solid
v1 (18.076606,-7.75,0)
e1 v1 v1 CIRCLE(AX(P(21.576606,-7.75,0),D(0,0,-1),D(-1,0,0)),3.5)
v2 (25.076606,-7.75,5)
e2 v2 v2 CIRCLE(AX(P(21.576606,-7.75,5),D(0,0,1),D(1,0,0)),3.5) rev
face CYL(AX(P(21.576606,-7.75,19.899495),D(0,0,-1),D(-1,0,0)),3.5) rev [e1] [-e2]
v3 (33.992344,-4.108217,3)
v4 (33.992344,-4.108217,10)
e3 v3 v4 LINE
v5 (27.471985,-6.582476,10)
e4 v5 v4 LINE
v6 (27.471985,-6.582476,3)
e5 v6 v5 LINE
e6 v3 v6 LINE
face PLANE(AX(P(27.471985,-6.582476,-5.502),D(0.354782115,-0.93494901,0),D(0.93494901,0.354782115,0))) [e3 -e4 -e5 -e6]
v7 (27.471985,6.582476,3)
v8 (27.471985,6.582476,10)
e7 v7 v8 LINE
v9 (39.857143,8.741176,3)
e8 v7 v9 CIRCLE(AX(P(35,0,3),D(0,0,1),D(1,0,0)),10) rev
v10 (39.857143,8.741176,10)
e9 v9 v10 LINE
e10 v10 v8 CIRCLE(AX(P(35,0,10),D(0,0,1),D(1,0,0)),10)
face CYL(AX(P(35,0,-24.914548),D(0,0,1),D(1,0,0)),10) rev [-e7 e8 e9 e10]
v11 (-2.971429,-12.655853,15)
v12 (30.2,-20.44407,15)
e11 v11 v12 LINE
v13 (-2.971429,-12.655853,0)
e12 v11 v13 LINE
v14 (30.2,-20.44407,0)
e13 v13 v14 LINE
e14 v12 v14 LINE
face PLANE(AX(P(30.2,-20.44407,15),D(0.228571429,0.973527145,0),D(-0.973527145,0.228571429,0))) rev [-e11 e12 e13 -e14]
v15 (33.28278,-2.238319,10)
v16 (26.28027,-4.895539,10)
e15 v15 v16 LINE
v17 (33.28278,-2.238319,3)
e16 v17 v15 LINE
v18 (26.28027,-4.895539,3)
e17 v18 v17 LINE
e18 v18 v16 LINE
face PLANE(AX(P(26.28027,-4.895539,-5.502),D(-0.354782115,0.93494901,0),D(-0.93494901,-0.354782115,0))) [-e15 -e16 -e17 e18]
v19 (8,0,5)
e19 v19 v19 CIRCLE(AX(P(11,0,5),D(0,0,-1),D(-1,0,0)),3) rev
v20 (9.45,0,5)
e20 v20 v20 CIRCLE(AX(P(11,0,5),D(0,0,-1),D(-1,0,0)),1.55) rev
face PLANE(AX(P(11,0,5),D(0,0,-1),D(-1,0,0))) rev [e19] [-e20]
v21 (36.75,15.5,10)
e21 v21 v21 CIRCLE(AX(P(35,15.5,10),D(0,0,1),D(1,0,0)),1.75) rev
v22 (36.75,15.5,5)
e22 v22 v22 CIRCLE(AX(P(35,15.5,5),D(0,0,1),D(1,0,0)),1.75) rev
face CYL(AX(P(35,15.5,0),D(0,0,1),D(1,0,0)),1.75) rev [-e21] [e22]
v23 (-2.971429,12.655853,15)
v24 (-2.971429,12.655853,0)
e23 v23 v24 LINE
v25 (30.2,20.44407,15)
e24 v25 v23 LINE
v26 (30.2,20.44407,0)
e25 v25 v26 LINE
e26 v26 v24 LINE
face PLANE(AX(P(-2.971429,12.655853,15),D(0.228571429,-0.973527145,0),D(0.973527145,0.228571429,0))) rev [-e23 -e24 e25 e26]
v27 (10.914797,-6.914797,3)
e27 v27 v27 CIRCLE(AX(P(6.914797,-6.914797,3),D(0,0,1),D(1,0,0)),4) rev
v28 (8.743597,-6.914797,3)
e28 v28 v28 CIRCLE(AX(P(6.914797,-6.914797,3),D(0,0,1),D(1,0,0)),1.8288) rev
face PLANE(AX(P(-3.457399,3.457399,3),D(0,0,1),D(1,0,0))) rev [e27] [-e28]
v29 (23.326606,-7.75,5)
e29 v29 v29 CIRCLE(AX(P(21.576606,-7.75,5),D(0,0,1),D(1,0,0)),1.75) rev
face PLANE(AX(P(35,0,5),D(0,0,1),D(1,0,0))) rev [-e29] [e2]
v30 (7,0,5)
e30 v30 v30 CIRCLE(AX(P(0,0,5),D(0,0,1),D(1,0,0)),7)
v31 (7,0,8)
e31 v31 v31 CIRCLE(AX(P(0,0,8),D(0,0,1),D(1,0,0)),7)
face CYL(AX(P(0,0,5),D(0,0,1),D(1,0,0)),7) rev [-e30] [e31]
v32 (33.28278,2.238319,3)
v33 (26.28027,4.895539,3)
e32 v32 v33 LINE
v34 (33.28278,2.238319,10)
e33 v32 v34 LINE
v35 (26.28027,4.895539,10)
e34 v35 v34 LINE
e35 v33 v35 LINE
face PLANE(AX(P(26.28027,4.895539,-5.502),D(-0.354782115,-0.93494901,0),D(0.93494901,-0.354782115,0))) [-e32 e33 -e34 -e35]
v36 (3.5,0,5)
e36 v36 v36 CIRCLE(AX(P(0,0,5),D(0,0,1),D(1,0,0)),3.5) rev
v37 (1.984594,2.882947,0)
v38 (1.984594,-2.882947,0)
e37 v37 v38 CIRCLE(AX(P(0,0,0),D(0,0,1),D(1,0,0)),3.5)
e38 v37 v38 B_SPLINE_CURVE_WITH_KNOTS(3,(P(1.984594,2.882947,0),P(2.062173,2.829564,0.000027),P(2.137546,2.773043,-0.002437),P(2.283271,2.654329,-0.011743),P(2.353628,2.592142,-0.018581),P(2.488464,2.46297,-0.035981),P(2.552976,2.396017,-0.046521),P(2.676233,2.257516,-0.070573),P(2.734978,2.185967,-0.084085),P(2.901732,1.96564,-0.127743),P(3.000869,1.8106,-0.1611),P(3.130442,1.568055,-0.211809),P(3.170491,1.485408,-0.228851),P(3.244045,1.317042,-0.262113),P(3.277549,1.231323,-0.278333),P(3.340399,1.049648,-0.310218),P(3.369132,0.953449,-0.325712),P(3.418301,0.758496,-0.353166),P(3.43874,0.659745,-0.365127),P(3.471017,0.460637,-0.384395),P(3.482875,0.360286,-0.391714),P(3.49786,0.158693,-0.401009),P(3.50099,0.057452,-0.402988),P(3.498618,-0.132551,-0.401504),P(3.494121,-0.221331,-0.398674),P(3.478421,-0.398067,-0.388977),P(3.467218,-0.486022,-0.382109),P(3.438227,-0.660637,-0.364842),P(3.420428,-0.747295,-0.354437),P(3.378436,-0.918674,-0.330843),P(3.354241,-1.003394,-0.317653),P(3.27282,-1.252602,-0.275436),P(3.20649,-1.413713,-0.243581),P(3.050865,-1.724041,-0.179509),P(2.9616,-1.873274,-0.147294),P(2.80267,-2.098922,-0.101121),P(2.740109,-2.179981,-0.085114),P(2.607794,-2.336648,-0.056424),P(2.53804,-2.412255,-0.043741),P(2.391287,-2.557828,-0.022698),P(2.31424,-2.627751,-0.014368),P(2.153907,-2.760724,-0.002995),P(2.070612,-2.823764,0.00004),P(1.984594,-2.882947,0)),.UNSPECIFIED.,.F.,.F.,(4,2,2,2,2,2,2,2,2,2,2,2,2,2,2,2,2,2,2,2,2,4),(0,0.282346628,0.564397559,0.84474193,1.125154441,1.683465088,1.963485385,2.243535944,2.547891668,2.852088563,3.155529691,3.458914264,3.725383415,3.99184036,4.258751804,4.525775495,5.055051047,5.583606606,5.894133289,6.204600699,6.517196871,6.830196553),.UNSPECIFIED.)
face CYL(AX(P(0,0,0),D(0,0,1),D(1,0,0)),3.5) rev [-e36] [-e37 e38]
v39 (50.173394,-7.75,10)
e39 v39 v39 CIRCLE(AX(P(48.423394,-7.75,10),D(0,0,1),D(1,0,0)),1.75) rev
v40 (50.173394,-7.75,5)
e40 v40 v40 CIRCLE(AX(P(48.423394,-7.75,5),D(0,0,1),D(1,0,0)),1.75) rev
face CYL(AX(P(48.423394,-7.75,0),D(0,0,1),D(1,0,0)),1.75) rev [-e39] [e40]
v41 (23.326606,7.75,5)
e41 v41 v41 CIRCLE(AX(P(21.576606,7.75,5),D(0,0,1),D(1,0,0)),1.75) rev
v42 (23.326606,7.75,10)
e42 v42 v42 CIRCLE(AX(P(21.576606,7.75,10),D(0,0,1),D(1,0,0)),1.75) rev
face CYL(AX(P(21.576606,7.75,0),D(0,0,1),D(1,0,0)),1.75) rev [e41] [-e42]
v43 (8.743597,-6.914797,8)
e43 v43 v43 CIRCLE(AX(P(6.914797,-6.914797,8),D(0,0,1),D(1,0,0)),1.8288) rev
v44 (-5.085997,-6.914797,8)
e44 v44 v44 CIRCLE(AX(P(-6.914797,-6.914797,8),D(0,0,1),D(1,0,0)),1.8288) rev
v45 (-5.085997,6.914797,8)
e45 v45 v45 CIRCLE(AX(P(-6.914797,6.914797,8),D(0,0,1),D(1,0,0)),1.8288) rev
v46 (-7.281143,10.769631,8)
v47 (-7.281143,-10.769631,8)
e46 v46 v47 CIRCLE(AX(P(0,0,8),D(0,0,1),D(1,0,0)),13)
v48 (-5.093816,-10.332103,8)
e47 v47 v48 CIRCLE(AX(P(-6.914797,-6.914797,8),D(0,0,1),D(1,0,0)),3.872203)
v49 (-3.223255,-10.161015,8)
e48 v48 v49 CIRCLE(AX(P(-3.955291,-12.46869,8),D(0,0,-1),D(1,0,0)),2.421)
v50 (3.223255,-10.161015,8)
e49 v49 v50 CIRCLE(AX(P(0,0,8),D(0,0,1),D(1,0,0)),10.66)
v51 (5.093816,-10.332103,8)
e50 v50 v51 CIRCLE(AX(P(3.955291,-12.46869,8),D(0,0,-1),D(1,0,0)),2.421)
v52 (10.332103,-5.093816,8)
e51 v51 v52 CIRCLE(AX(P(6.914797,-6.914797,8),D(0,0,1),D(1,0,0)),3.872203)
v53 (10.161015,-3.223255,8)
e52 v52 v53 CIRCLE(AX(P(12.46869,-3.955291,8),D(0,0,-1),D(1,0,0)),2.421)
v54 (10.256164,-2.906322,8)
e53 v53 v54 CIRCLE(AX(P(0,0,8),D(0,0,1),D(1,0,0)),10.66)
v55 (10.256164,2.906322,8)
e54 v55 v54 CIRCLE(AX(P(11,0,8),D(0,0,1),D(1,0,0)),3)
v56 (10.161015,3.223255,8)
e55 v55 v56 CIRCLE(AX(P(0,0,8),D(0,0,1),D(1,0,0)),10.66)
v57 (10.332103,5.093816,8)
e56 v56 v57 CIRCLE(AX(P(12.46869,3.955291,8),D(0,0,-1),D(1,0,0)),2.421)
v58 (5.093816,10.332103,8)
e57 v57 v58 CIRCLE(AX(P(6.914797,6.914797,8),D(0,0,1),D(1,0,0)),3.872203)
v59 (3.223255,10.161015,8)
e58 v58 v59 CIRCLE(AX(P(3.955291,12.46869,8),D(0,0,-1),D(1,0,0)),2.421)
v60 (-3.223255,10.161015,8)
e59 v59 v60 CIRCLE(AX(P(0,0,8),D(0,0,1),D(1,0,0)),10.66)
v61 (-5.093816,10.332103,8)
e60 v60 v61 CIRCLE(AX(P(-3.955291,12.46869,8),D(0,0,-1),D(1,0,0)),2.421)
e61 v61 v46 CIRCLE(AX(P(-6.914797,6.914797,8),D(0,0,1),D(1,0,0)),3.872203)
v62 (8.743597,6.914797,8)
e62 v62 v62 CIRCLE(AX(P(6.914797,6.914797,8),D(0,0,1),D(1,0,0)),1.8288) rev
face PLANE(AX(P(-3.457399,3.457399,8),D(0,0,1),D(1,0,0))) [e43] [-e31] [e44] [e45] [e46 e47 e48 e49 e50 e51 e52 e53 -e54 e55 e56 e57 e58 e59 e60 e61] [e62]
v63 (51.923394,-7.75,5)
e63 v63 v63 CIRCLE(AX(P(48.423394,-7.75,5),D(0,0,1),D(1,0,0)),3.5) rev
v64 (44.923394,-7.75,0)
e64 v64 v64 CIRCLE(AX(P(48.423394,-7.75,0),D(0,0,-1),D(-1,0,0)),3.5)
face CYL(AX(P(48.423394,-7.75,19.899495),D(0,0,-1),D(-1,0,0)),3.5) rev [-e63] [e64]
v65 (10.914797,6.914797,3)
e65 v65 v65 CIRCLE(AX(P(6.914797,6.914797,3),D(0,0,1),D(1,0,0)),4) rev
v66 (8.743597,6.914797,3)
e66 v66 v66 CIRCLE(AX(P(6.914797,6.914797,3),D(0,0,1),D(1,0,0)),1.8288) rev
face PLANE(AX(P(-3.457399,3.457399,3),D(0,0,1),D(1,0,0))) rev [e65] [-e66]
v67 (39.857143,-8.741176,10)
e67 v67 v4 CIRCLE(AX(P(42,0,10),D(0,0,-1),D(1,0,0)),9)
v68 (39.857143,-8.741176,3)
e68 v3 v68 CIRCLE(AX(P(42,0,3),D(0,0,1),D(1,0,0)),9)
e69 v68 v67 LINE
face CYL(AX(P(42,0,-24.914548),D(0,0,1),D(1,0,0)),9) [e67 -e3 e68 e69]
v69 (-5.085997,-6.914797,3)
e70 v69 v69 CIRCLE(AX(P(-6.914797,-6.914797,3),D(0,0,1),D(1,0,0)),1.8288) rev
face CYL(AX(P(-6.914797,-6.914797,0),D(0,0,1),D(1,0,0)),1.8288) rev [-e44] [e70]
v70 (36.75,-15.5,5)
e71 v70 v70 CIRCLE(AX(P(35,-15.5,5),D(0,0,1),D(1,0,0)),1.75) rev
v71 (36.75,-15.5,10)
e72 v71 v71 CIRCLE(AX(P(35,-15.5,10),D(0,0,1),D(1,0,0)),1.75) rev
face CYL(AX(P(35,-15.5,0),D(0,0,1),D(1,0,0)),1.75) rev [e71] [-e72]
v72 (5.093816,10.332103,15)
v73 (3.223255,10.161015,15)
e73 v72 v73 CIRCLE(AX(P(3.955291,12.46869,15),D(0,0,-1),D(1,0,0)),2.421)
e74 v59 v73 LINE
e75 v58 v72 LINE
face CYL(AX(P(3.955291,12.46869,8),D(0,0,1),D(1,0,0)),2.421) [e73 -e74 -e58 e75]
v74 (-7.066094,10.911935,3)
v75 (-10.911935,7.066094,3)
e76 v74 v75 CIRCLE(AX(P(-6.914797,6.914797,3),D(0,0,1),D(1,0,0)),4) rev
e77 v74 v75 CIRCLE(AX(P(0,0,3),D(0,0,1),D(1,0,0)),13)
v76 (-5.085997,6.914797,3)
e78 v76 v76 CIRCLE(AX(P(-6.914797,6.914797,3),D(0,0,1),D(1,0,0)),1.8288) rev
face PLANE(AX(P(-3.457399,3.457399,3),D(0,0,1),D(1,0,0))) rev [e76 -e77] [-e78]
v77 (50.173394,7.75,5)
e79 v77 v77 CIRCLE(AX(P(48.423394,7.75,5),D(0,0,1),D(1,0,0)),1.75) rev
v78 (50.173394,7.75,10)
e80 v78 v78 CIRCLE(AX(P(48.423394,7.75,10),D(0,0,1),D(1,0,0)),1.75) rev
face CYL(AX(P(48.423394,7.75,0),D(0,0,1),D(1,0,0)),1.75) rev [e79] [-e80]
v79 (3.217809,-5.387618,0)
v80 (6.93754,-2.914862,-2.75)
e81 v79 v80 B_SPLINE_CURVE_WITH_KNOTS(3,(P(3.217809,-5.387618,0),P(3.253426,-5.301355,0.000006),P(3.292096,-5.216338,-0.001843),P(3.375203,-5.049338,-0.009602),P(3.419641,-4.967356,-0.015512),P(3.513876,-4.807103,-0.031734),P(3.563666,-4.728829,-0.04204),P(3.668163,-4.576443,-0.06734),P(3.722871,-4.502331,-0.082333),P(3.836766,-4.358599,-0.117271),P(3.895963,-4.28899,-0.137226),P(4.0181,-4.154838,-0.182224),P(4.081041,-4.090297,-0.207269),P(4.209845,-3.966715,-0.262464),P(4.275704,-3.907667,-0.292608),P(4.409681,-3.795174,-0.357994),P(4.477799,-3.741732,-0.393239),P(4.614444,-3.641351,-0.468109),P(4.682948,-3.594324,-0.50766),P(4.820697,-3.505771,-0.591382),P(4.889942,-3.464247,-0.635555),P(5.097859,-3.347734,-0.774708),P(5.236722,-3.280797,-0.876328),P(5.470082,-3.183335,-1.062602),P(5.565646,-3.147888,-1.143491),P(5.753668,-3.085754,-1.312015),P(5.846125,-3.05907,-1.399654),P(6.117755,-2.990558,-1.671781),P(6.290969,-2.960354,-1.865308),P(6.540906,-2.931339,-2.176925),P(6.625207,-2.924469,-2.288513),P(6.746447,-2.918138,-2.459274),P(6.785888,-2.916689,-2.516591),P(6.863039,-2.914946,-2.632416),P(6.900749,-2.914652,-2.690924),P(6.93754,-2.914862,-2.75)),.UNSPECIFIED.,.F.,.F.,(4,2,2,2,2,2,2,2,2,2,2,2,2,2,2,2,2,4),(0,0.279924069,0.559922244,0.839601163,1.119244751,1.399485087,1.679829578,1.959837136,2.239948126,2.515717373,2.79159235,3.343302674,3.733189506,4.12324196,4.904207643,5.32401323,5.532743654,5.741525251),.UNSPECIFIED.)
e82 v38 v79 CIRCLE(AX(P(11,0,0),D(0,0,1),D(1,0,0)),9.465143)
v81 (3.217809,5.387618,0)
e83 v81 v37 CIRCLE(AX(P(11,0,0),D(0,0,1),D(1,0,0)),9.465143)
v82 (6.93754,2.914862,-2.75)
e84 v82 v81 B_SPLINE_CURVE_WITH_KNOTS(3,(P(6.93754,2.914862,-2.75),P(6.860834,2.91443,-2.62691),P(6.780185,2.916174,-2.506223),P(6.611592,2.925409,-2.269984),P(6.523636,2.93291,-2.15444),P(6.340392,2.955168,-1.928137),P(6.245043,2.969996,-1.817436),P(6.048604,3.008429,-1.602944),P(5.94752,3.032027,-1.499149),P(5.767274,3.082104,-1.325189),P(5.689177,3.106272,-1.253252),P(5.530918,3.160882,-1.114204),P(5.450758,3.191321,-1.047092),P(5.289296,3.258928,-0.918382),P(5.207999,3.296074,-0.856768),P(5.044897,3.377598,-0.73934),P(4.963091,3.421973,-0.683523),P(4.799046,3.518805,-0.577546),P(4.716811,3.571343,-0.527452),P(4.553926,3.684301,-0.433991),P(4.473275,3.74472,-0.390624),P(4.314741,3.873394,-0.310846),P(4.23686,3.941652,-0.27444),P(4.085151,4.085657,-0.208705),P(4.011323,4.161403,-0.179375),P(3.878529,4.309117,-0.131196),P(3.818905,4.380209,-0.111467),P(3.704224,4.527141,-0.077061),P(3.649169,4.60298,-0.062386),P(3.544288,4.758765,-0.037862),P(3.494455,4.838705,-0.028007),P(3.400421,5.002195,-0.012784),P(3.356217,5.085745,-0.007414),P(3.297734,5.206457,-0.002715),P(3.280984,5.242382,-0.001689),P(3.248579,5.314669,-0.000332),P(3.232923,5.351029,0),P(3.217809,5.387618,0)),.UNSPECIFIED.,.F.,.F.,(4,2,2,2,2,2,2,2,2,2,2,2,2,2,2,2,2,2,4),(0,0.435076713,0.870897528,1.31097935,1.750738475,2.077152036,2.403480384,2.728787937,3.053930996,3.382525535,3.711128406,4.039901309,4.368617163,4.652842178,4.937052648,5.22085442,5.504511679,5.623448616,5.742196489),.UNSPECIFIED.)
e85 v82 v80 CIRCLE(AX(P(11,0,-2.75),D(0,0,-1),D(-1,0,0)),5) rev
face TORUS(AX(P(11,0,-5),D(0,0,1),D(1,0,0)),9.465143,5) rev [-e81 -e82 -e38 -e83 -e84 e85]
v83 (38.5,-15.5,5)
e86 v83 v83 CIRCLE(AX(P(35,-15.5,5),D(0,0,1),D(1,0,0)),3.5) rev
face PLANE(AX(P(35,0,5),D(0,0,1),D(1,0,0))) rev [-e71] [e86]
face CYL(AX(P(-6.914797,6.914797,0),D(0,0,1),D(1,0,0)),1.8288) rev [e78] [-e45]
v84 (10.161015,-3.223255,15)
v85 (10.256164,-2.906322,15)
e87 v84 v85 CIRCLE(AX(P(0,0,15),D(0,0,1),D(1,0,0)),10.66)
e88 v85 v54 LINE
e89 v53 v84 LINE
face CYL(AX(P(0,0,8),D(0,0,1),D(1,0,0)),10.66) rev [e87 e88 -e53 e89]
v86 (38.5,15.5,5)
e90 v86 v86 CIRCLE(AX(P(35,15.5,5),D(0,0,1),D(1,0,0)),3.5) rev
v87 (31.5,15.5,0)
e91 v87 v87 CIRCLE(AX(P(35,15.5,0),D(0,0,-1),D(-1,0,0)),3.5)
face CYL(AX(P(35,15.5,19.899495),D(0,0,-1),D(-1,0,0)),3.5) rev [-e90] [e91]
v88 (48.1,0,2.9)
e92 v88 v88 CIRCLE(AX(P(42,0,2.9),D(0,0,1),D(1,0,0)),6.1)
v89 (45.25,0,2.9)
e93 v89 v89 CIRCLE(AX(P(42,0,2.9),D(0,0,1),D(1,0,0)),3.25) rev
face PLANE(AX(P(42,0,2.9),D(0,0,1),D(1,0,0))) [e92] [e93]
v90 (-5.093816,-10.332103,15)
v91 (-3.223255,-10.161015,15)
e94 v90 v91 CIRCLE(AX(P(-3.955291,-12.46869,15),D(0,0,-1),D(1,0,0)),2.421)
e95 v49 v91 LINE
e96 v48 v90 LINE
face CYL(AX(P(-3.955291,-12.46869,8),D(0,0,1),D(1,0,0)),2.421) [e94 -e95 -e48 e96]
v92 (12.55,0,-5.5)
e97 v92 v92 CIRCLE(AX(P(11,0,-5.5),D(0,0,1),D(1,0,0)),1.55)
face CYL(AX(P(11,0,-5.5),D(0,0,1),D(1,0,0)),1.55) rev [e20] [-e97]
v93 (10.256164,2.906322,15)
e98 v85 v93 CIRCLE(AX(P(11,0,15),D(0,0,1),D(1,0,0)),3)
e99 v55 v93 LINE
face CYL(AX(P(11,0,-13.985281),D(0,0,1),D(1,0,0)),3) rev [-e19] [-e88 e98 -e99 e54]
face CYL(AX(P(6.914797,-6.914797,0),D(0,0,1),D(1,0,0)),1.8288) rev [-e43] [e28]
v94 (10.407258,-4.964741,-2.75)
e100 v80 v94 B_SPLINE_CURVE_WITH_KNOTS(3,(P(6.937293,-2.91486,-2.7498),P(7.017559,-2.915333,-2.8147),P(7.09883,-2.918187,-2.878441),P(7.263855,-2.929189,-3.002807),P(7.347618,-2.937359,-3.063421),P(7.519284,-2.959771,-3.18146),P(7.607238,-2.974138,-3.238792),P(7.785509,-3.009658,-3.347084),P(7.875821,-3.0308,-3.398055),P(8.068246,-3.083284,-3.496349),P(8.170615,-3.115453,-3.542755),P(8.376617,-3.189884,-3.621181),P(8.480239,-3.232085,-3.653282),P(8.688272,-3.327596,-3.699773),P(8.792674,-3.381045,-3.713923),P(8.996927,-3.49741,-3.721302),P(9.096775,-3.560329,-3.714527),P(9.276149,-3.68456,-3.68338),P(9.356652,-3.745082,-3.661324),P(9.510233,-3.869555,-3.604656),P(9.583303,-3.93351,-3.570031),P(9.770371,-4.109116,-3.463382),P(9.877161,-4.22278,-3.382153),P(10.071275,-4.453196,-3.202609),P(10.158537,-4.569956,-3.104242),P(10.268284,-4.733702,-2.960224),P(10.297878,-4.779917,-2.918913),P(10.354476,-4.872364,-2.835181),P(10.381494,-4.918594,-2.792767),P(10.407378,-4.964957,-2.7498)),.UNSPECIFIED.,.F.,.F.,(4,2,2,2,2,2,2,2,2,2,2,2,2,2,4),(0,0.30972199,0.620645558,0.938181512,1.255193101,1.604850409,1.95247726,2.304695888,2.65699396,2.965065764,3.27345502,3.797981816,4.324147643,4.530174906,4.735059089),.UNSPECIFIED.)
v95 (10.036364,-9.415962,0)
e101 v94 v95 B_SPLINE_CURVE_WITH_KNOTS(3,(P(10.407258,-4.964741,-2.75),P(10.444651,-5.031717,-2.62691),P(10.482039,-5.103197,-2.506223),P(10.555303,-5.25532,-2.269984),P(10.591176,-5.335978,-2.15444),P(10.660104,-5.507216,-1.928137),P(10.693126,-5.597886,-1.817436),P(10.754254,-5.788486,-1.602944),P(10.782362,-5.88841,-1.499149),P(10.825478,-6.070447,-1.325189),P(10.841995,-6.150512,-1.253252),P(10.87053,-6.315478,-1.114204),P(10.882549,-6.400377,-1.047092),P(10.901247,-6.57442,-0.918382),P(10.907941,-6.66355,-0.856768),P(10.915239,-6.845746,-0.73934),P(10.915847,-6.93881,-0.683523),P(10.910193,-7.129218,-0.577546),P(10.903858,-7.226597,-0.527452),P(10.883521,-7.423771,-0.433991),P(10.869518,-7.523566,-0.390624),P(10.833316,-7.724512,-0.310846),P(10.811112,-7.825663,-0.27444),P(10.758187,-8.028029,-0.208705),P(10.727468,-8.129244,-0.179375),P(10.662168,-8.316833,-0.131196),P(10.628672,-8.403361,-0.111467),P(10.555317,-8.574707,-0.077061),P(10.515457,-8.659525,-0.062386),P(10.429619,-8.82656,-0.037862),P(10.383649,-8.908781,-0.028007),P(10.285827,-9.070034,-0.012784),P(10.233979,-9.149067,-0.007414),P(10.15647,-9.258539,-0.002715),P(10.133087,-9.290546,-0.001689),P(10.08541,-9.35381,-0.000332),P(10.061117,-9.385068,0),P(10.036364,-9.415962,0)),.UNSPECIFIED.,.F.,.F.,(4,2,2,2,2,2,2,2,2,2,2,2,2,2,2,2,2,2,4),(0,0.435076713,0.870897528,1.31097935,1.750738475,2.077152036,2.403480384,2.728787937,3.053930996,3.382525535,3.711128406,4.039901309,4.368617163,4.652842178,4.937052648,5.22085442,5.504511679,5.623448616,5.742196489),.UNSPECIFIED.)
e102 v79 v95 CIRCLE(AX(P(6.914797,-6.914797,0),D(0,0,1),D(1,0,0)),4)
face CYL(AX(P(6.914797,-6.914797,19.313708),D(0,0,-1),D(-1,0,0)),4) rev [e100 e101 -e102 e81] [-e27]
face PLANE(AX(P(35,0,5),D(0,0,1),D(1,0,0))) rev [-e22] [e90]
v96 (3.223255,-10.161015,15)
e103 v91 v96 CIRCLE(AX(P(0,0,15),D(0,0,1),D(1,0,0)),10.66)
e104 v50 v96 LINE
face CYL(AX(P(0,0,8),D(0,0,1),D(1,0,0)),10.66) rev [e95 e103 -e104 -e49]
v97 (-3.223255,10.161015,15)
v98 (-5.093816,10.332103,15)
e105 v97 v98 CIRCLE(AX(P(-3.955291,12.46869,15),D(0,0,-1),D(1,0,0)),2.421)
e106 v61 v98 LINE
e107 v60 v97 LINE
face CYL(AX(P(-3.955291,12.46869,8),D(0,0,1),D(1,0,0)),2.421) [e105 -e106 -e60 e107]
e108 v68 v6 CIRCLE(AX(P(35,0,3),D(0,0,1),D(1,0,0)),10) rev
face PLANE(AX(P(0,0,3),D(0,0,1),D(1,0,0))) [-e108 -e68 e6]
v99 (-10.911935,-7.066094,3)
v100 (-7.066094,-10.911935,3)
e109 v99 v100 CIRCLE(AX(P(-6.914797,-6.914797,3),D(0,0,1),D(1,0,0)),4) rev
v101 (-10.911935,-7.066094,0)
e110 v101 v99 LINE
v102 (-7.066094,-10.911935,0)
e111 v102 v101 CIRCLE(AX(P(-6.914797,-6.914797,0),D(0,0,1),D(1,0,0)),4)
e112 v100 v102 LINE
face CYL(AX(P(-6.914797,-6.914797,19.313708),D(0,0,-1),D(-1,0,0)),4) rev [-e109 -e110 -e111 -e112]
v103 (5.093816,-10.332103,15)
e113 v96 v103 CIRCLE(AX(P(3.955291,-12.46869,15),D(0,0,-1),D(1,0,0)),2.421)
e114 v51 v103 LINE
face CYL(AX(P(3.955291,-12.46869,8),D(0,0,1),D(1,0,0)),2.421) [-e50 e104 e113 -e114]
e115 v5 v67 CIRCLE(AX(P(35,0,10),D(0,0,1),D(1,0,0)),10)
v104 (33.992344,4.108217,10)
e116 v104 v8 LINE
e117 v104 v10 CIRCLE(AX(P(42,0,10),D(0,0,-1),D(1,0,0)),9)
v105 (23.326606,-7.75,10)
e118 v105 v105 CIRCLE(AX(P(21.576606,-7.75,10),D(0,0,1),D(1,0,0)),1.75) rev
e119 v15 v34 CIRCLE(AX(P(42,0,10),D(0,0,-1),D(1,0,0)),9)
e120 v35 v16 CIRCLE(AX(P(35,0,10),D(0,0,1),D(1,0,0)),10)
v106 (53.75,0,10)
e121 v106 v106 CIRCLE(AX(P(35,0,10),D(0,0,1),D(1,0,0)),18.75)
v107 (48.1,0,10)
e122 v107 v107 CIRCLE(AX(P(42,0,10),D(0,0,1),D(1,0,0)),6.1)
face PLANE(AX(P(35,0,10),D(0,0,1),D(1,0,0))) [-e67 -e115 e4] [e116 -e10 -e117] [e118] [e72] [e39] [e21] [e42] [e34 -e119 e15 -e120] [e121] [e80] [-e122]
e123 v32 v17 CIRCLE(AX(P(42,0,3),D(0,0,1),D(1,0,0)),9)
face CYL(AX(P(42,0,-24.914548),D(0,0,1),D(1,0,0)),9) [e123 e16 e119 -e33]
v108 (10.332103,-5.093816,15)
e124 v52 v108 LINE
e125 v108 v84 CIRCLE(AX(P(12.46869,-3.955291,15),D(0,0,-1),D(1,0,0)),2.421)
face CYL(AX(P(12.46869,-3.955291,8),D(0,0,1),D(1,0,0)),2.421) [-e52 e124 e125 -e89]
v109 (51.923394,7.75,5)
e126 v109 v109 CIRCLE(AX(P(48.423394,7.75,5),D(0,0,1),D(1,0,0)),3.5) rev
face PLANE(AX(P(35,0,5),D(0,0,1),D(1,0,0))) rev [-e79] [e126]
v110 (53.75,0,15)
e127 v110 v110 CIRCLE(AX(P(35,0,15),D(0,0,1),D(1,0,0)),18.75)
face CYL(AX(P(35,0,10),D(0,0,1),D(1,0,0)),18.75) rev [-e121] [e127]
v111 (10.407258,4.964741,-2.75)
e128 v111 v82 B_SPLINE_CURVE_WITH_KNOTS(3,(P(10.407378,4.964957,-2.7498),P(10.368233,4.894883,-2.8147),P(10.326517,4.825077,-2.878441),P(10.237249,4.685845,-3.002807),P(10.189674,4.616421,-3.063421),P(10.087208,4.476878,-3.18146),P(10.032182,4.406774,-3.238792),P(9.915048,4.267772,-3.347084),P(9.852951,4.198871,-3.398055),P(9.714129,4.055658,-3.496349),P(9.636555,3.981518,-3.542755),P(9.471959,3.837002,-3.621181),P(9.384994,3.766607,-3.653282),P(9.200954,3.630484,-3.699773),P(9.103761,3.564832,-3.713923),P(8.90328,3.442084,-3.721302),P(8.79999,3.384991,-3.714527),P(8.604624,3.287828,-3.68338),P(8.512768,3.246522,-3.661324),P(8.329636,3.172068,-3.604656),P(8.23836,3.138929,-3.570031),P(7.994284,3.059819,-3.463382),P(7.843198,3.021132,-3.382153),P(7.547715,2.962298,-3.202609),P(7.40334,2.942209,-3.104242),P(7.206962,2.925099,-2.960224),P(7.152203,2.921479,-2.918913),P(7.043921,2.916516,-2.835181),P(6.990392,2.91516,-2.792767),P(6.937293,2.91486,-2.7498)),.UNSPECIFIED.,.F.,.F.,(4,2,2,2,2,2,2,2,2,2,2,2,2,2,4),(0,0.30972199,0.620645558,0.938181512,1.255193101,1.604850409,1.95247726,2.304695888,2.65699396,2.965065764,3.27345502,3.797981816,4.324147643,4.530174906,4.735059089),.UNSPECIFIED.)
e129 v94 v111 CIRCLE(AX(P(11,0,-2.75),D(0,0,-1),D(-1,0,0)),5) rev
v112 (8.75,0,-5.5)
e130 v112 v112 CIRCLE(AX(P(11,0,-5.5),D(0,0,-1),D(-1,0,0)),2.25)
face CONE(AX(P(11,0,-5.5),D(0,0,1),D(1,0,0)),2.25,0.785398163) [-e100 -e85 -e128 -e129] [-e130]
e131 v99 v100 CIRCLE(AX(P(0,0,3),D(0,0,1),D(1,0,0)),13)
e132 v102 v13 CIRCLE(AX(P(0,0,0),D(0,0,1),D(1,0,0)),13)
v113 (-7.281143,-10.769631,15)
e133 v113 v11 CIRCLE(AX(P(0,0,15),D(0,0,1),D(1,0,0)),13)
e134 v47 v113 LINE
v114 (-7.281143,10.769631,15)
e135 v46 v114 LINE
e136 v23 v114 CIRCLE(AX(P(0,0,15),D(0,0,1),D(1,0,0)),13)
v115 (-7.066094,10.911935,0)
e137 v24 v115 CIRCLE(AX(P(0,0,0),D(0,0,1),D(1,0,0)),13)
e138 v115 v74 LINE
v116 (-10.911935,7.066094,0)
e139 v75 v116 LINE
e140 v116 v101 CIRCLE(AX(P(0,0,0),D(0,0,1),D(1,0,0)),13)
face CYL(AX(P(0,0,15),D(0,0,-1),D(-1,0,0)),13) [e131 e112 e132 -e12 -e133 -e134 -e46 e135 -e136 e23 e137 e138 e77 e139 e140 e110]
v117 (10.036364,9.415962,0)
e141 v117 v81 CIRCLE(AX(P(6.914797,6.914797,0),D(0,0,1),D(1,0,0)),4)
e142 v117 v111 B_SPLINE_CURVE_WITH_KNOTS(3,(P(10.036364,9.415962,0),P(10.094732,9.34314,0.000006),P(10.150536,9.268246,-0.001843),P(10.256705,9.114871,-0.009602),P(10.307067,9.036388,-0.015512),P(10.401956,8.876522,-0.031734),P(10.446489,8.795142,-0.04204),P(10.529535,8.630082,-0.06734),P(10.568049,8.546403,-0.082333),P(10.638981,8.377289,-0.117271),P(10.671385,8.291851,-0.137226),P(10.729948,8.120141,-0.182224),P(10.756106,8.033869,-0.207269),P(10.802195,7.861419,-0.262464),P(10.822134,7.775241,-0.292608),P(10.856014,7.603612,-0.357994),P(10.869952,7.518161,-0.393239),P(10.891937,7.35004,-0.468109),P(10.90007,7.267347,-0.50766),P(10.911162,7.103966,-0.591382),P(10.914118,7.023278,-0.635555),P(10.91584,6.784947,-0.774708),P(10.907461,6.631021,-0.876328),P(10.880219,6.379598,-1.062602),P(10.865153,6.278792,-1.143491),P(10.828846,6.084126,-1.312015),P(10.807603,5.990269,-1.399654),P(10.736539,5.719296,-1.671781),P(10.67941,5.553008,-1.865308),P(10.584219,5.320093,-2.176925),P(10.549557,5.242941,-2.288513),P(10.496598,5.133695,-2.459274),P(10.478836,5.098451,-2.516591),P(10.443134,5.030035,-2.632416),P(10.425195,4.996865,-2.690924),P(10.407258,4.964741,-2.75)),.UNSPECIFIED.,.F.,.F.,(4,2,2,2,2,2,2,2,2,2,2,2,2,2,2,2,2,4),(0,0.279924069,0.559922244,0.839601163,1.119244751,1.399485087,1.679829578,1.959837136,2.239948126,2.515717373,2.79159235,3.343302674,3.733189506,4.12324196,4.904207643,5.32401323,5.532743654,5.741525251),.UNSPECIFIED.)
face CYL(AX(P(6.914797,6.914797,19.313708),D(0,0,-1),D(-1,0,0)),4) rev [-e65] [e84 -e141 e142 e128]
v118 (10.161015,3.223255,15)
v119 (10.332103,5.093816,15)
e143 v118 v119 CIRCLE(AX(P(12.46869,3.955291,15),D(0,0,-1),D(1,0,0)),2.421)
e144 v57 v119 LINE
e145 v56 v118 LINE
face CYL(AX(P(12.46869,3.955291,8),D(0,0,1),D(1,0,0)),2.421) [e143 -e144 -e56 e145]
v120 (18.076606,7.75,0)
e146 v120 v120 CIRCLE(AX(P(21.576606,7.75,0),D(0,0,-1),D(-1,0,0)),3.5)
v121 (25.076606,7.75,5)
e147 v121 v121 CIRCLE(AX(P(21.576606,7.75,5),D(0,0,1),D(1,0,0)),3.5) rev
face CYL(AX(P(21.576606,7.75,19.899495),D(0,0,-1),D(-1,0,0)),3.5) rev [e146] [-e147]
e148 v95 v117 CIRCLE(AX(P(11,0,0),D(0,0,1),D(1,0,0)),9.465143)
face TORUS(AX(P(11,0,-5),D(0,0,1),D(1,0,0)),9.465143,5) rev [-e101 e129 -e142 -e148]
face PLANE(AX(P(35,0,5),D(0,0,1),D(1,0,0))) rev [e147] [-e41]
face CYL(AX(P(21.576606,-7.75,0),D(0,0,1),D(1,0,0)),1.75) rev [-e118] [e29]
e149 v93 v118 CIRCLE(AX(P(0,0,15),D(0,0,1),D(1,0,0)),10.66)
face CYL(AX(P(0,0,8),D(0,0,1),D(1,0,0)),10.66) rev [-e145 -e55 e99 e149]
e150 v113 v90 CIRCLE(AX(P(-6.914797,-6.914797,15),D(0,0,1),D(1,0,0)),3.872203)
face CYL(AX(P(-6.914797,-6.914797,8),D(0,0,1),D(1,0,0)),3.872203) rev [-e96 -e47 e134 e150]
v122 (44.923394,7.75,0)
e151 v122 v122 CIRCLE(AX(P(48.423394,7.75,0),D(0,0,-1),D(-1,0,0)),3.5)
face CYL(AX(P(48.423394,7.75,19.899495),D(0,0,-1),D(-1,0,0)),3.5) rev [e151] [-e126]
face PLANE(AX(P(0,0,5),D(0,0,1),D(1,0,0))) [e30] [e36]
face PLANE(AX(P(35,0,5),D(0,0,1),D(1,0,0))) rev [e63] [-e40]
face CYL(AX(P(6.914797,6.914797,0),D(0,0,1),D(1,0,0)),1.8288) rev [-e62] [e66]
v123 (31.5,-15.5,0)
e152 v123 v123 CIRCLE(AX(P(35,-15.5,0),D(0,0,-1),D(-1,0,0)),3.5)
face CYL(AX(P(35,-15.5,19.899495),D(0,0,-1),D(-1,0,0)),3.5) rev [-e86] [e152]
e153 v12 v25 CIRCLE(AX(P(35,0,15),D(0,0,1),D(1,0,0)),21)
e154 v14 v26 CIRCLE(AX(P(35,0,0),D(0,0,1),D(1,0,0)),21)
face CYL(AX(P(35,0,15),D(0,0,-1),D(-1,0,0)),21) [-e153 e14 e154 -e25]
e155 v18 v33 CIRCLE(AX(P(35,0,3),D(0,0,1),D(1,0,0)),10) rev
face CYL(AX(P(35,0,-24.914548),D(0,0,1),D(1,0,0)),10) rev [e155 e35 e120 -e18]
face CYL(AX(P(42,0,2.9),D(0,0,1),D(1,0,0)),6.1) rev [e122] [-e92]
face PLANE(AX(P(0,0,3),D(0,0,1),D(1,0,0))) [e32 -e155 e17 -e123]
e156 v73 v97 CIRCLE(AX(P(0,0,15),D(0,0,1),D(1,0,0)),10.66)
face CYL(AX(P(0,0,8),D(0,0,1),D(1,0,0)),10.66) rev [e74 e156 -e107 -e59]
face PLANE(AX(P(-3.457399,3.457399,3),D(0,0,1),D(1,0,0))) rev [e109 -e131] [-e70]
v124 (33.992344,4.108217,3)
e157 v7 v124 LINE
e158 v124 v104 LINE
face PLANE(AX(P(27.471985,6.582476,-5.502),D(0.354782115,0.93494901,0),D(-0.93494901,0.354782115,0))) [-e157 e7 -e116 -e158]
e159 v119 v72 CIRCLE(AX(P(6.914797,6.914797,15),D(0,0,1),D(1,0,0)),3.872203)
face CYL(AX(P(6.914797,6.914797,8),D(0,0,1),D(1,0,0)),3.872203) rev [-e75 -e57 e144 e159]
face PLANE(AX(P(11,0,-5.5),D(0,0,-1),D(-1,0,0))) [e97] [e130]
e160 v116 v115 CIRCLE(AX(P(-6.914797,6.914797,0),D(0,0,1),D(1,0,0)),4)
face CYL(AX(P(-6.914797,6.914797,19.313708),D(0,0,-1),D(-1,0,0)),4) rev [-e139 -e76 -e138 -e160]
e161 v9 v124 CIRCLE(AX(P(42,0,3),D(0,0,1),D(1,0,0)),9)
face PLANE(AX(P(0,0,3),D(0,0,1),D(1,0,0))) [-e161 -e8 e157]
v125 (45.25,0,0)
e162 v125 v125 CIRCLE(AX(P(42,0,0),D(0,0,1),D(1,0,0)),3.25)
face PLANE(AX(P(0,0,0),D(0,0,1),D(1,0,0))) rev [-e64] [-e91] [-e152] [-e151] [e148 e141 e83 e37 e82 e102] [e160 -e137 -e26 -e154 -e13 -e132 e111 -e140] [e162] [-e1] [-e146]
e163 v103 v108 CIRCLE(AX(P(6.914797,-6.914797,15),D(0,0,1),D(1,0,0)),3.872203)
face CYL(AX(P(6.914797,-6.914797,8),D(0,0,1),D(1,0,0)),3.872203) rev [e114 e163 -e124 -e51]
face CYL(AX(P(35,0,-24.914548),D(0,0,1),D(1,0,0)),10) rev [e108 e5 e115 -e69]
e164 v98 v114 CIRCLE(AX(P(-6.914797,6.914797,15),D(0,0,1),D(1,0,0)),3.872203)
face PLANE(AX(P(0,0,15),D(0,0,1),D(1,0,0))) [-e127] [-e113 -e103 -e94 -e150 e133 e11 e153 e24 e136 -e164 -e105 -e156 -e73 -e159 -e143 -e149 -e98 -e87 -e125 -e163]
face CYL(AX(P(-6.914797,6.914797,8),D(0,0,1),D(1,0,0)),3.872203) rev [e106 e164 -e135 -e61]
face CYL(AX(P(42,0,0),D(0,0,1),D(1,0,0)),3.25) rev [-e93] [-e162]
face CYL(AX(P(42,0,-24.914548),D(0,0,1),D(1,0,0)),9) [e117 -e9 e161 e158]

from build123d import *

# Parameters (mm, degrees)
BOSS_EXTRUDE1_DEPTH          = 15
SKETCH6_R                    = 3.5
SKETCH6_R_2                  = 1.8288
HUB_MOUNT_HOLE_PATTERN_DEPTH = 62.660360038
SKETCH7_R                    = 1.75
SKETCH7_R_2                  = 3.25
MOTOR_HOLE_PATTERN_DEPTH     = 62.660360038
SKETCH8_R                    = 18.75
MOTOR_CUTOUT_DEPTH           = 5
HUB_START                    = -7
HUB_MOUNT_CUTOUT_DEPTH       = 7
SKETCH10_R                   = 5
BOSS_EXTRUDE2_DEPTH          = 5.5
LINKAGE_PIN_HOLE_DEPTH       = 62.660360038
LINKAGE_PIN_HOLE_DEPTH_BACK  = 62.660360038
SKETCH12_R                   = 1.55
CHAMFER1_SIZE                = 2.75
SKETCH13_R                   = 6.1
CUT_EXTRUDE7_DEPTH           = 7.1
SKETCH14_R                   = 7
CUT_EXTRUDE8_DEPTH           = 3
SKETCH15_R                   = 3.5
CUT_EXTRUDE9_DEPTH           = 5
CUT_EXTRUDE10_DEPTH          = 62.312722986
CUT_EXTRUDE10_DEPTH_BACK     = 3
SKETCH16_R                   = 3
CUT_EXTRUDE12_DEPTH          = 7
BOSS_EXTRUDE3_REACH          = 63.784
CUT_EXTRUDE13_DEPTH          = 62.660360038
CUT_EXTRUDE13_DEPTH_BACK     = 3
SKETCH19_R                   = 4
FILLET1_R                    = 5


with BuildPart() as part:
    # Sketch2 → Boss-Extrude1 (new body)
    with BuildSketch(Plane.XY):
        with BuildLine():
            Line((-2.971428571, 12.655852885), (30.2, 20.444070045))
            ThreePointArc((30.2, 20.444070045), (56, 0), (30.2, -20.444070045))
            Line((30.2, -20.444070045), (-2.971428571, -12.655852885))
            ThreePointArc((-2.971428571, -12.655852885), (-13, 0), (-2.971428571, 12.655852885))
        make_face()
    extrude(amount=BOSS_EXTRUDE1_DEPTH)

    # Sketch6 → hub mount hole pattern (cut, through all)
    with BuildSketch(Plane.XY.offset(15)):
        Circle(SKETCH6_R)
        with Locations((-6.914797213, 6.914797213)):
            Circle(SKETCH6_R_2)
        with Locations((6.914797213, 6.914797213)):
            Circle(SKETCH6_R_2)
        with Locations((6.914797213, -6.914797213)):
            Circle(SKETCH6_R_2)
        with Locations((-6.914797213, -6.914797213)):
            Circle(SKETCH6_R_2)
    extrude(amount=-HUB_MOUNT_HOLE_PATTERN_DEPTH, mode=Mode.SUBTRACT)

    # Sketch7 → motor hole pattern (cut, through all)
    with BuildSketch(Plane.XY.offset(15)):
        with Locations((21.576606241, 7.75)):
            Circle(SKETCH7_R)
        with Locations((35, 15.5)):
            Circle(SKETCH7_R)
        with Locations((48.423393759, 7.75)):
            Circle(SKETCH7_R)
        with Locations((48.423393759, -7.75)):
            Circle(SKETCH7_R)
        with Locations((35, -15.5)):
            Circle(SKETCH7_R)
        with Locations((21.576606241, -7.75)):
            Circle(SKETCH7_R)
        with Locations((42, 0)):
            Circle(SKETCH7_R_2)
    extrude(amount=-MOTOR_HOLE_PATTERN_DEPTH, mode=Mode.SUBTRACT)

    # Sketch8 → motor cutout (cut)
    with BuildSketch(Plane.XY.offset(15)):
        with Locations((35, 0)):
            Circle(SKETCH8_R)
    extrude(amount=-MOTOR_CUTOUT_DEPTH, mode=Mode.SUBTRACT)

    # Sketch9 → hub mount cutout (cut)
    with BuildSketch(Plane.XY.offset(15).offset(HUB_START)):
        with BuildLine():
            ThreePointArc((-7.281143007, 10.769631215), (-13, 0), (-7.281143007, -10.769631215))
            ThreePointArc((-7.281143007, -10.769631215), (-6.15529138, -10.711783559), (-5.093815501, -10.332103173))
            ThreePointArc((-5.093815501, -10.332103173), (-4.17580433, -10.057753531), (-3.223255475, -10.161014917))
            ThreePointArc((-3.223255475, -10.161014917), (0, -10.66), (3.223255475, -10.161014917))
            ThreePointArc((3.223255475, -10.161014917), (4.17580433, -10.057753531), (5.093815501, -10.332103173))
            ThreePointArc((5.093815501, -10.332103173), (9.652858062, -9.652858062), (10.332103173, -5.093815501))
            ThreePointArc((10.332103173, -5.093815501), (10.057753531, -4.17580433), (10.161014917, -3.223255475))
            ThreePointArc((10.161014917, -3.223255475), (10.66, 0), (10.161014917, 3.223255475))
            ThreePointArc((10.161014917, 3.223255475), (10.057753531, 4.17580433), (10.332103173, 5.093815501))
            ThreePointArc((10.332103173, 5.093815501), (9.652858062, 9.652858062), (5.093815501, 10.332103173))
            ThreePointArc((5.093815501, 10.332103173), (4.17580433, 10.057753531), (3.223255475, 10.161014917))
            ThreePointArc((3.223255475, 10.161014917), (0, 10.66), (-3.223255475, 10.161014917))
            ThreePointArc((-3.223255475, 10.161014917), (-4.17580433, 10.057753531), (-5.093815501, 10.332103173))
            ThreePointArc((-5.093815501, 10.332103173), (-6.15529138, 10.711783559), (-7.281143007, 10.769631215))
        make_face()
    extrude(amount=HUB_MOUNT_CUTOUT_DEPTH, mode=Mode.SUBTRACT)

    # Sketch10 → Boss-Extrude2 (add)
    with BuildSketch(Plane(origin=(0, 0, 0), x_dir=(-1, 0, 0), z_dir=(0, 0, -1))):
        with Locations(Location((-11, 0, 0), (0, 0, 180))):
            Circle(SKETCH10_R)
    extrude(amount=BOSS_EXTRUDE2_DEPTH)

    # Sketch12 → Linkage pin hole (cut, two sides: drawn at the far end of the back side and taken through both)
    with BuildSketch(Plane.XY.offset(-LINKAGE_PIN_HOLE_DEPTH_BACK)):
        with Locations((11, 0)):
            Circle(SKETCH12_R)
    extrude(amount=LINKAGE_PIN_HOLE_DEPTH + LINKAGE_PIN_HOLE_DEPTH_BACK, mode=Mode.SUBTRACT)

    # Chamfer1
    chamfer1_edges = [part.edges().sort_by_distance(p)[0] for p in [
        (6, 0, -5.5),
    ]]
    chamfer(chamfer1_edges, length=CHAMFER1_SIZE)

    # Sketch13 → Cut-Extrude7 (cut)
    with BuildSketch(Plane.XY.offset(10)):
        with Locations((42, 0)):
            Circle(SKETCH13_R)
    extrude(amount=-CUT_EXTRUDE7_DEPTH, mode=Mode.SUBTRACT)

    # Sketch14 → Cut-Extrude8 (cut)
    with BuildSketch(Plane.XY.offset(8)):
        Circle(SKETCH14_R)
    extrude(amount=-CUT_EXTRUDE8_DEPTH, mode=Mode.SUBTRACT)

    # Sketch15 → Cut-Extrude9 (cut)
    with BuildSketch(Plane(origin=(0, 0, 0), x_dir=(-1, 0, 0), z_dir=(0, 0, -1))):
        with Locations((-21.576606241, -7.75)):
            Circle(SKETCH15_R)
        with Locations((-35, -15.5)):
            Circle(SKETCH15_R)
        with Locations((-48.423393759, -7.75)):
            Circle(SKETCH15_R)
        with Locations((-48.423393759, 7.75)):
            Circle(SKETCH15_R)
        with Locations((-35, 15.5)):
            Circle(SKETCH15_R)
        with Locations((-21.576606241, 7.75)):
            Circle(SKETCH15_R)
    extrude(amount=-CUT_EXTRUDE9_DEPTH, mode=Mode.SUBTRACT)

    # Sketch16 → Cut-Extrude10 (cut, two sides: drawn at the far end of the back side and taken through both)
    with BuildSketch(Plane.XY.offset(8).offset(-CUT_EXTRUDE10_DEPTH_BACK)):
        with Locations(Location((11, 0, 0), (0, 0, 104.35596801))):
            Circle(SKETCH16_R)
    extrude(amount=CUT_EXTRUDE10_DEPTH + CUT_EXTRUDE10_DEPTH_BACK, mode=Mode.SUBTRACT)

    # Sketch17 → Cut-Extrude12 (cut)
    with BuildSketch(Plane.XY.offset(10)):
        with BuildLine():
            ThreePointArc((39.857142857, 8.741176309), (25, 0), (39.857142857, -8.741176309))
            ThreePointArc((39.857142857, -8.741176309), (33, 0), (39.857142857, 8.741176309))
        make_face()
    extrude(amount=-CUT_EXTRUDE12_DEPTH, mode=Mode.SUBTRACT)

    # Sketch18 → Boss-Extrude3 (add, up to next)
    with BuildSketch(Plane.XY.offset(10), mode=Mode.PRIVATE) as boss_extrude3_sk1:
        with BuildLine():
            Line((27.471985333, -6.582476371), (33.992343948, -4.108216712))
            ThreePointArc((33.992343948, -4.108216712), (33.585458911, -3.193039032), (33.282779719, -2.238318693))
            Line((33.282779719, -2.238318693), (26.280269544, -4.895538864))
            ThreePointArc((26.280269544, -4.895538864), (26.83245784, -5.769857456), (27.471985333, -6.582476371))
        make_face()
    boss_extrude3_tool1 = extrude(boss_extrude3_sk1.sketch, amount=-BOSS_EXTRUDE3_REACH, mode=Mode.PRIVATE) - part.part
    # Sketch18 → Boss-Extrude3 (add, up to next)
    with BuildSketch(Plane.XY.offset(10), mode=Mode.PRIVATE) as boss_extrude3_sk2:
        with BuildLine():
            Line((27.471985333, 6.582476371), (33.992343948, 4.108216712))
            ThreePointArc((33.992343948, 4.108216712), (33.585458911, 3.193039032), (33.282779719, 2.238318693))
            Line((33.282779719, 2.238318693), (26.280269544, 4.895538864))
            ThreePointArc((26.280269544, 4.895538864), (26.83245784, 5.769857456), (27.471985333, 6.582476371))
        make_face()
    boss_extrude3_tool2 = extrude(boss_extrude3_sk2.sketch, amount=-BOSS_EXTRUDE3_REACH, mode=Mode.PRIVATE) - part.part
    add(boss_extrude3_tool1.solids().sort_by_distance((30.216616, -4.45872, 10))[0])
    add(boss_extrude3_tool2.solids().sort_by_distance((30.216616, 4.45872, 10))[0])

    # Sketch19 → Cut-Extrude13 (cut, two sides: drawn at the far end of the back side and taken through both)
    with BuildSketch(Plane(origin=(0, 0, 0), x_dir=(-1, 0, 0), z_dir=(0, 0, -1)).offset(-CUT_EXTRUDE13_DEPTH_BACK)):
        with Locations(Location((-6.914797213, -6.914797213, 0), (0, 0, 90.325769881))):
            Circle(SKETCH19_R)
        with Locations(Location((-6.914797213, 6.914797213, 0), (0, 0, 269.674230119))):
            Circle(SKETCH19_R)
        with Locations((6.914797213, 6.914797213)):
            Circle(SKETCH19_R)
        with Locations((6.914797213, -6.914797213)):
            Circle(SKETCH19_R)
    extrude(amount=CUT_EXTRUDE13_DEPTH + CUT_EXTRUDE13_DEPTH_BACK, mode=Mode.SUBTRACT)

    # Fillet1
    # the kernel refuses this fillet: 5 mm, written as the material it adds along each edge
    with BuildSketch(Plane(origin=(11, 0, 0), x_dir=(-0.9999950652018581, 0.003141587485879405, 0), z_dir=(-0.003141587485879405, -0.9999950652018581, 0))) as fillet1_piece_1_section:
        with BuildLine():
            CenterArc((9.465142775, 5), FILLET1_R, 206.74368395, 63.25631605)
            Line((9.465142775, 0), (9.465142775, -0.1))
            Line((9.465142775, -0.1), (5, -0.1))
            Line((5, -0.1), (4.9, 0))
            ThreePointArc((4.9, 0), (4.9, 1.375), (4.910697145, 2.705))
            Line((4.910697145, 2.705), (5, 2.75))
        make_face()
    fillet1_piece_1 = revolve(axis=Axis((11, 0, 0), (0, 0, -1)), revolution_arc=359.64, mode=Mode.PRIVATE)
    fillet1_piece_1 = fillet1_piece_1 - Plane(origin=(6.914797213, -6.914797213, -0.76540866), x_dir=(0.0056857263926290095, 0.9999838361270588, 0), z_dir=(0, 0, 1)) * Cylinder(4, 38, mode=Mode.PRIVATE)
    fillet1_piece_1 = fillet1_piece_1 - Plane(origin=(6.914797213, 6.914797213, -0.76540866), x_dir=(0.00568572639262881, -0.9999838361270588, 0), z_dir=(0, 0, 1)) * Cylinder(4, 38, mode=Mode.PRIVATE)
    fillet1_piece_1 = fillet1_piece_1 - Plane(origin=(0, 0, -0.76540866), x_dir=(1, 0, 0), z_dir=(0, 0, 1)) * Cylinder(3.5, 38, mode=Mode.PRIVATE)
    add(fillet1_piece_1)
    with BuildSketch(Plane(origin=(11, 0, 0), x_dir=(0.9593586032510993, -0.2821897772211103, 0), z_dir=(0.2821897772211103, 0.9593586032510993, 0))) as fillet1_piece_2_section:
        with BuildLine():
            CenterArc((9.465142775, 5), FILLET1_R, 206.74368395, 63.25631605)
            Line((9.465142775, 0), (9.465142775, -0.1))
            Line((9.465142775, -0.1), (5, -0.1))
            Line((5, -0.1), (4.9, 0))
            ThreePointArc((4.9, 0), (4.9, 1.375), (4.910697145, 2.705))
            Line((4.910697145, 2.705), (5, 2.75))
        make_face()
    fillet1_piece_2 = revolve(axis=Axis((11, 0, 0), (0, 0, -1)), revolution_arc=327.218117947, mode=Mode.PRIVATE)
    fillet1_piece_2 = fillet1_piece_2 - Plane(origin=(6.914797213, -6.914797213, -0.749324739), x_dir=(0.0056857263926290095, 0.9999838361270588, 0), z_dir=(0, 0, 1)) * Cylinder(4, 38, mode=Mode.PRIVATE)
    fillet1_piece_2 = fillet1_piece_2 - Plane(origin=(6.914797213, 6.914797213, -0.749324739), x_dir=(0.00568572639262881, -0.9999838361270588, 0), z_dir=(0, 0, 1)) * Cylinder(4, 38, mode=Mode.PRIVATE)
    fillet1_piece_2 = fillet1_piece_2 - Plane(origin=(0, 0, -0.749324739), x_dir=(1, 0, 0), z_dir=(0, 0, 1)) * Cylinder(3.5, 38, mode=Mode.PRIVATE)
    add(fillet1_piece_2)


solid = part.part
